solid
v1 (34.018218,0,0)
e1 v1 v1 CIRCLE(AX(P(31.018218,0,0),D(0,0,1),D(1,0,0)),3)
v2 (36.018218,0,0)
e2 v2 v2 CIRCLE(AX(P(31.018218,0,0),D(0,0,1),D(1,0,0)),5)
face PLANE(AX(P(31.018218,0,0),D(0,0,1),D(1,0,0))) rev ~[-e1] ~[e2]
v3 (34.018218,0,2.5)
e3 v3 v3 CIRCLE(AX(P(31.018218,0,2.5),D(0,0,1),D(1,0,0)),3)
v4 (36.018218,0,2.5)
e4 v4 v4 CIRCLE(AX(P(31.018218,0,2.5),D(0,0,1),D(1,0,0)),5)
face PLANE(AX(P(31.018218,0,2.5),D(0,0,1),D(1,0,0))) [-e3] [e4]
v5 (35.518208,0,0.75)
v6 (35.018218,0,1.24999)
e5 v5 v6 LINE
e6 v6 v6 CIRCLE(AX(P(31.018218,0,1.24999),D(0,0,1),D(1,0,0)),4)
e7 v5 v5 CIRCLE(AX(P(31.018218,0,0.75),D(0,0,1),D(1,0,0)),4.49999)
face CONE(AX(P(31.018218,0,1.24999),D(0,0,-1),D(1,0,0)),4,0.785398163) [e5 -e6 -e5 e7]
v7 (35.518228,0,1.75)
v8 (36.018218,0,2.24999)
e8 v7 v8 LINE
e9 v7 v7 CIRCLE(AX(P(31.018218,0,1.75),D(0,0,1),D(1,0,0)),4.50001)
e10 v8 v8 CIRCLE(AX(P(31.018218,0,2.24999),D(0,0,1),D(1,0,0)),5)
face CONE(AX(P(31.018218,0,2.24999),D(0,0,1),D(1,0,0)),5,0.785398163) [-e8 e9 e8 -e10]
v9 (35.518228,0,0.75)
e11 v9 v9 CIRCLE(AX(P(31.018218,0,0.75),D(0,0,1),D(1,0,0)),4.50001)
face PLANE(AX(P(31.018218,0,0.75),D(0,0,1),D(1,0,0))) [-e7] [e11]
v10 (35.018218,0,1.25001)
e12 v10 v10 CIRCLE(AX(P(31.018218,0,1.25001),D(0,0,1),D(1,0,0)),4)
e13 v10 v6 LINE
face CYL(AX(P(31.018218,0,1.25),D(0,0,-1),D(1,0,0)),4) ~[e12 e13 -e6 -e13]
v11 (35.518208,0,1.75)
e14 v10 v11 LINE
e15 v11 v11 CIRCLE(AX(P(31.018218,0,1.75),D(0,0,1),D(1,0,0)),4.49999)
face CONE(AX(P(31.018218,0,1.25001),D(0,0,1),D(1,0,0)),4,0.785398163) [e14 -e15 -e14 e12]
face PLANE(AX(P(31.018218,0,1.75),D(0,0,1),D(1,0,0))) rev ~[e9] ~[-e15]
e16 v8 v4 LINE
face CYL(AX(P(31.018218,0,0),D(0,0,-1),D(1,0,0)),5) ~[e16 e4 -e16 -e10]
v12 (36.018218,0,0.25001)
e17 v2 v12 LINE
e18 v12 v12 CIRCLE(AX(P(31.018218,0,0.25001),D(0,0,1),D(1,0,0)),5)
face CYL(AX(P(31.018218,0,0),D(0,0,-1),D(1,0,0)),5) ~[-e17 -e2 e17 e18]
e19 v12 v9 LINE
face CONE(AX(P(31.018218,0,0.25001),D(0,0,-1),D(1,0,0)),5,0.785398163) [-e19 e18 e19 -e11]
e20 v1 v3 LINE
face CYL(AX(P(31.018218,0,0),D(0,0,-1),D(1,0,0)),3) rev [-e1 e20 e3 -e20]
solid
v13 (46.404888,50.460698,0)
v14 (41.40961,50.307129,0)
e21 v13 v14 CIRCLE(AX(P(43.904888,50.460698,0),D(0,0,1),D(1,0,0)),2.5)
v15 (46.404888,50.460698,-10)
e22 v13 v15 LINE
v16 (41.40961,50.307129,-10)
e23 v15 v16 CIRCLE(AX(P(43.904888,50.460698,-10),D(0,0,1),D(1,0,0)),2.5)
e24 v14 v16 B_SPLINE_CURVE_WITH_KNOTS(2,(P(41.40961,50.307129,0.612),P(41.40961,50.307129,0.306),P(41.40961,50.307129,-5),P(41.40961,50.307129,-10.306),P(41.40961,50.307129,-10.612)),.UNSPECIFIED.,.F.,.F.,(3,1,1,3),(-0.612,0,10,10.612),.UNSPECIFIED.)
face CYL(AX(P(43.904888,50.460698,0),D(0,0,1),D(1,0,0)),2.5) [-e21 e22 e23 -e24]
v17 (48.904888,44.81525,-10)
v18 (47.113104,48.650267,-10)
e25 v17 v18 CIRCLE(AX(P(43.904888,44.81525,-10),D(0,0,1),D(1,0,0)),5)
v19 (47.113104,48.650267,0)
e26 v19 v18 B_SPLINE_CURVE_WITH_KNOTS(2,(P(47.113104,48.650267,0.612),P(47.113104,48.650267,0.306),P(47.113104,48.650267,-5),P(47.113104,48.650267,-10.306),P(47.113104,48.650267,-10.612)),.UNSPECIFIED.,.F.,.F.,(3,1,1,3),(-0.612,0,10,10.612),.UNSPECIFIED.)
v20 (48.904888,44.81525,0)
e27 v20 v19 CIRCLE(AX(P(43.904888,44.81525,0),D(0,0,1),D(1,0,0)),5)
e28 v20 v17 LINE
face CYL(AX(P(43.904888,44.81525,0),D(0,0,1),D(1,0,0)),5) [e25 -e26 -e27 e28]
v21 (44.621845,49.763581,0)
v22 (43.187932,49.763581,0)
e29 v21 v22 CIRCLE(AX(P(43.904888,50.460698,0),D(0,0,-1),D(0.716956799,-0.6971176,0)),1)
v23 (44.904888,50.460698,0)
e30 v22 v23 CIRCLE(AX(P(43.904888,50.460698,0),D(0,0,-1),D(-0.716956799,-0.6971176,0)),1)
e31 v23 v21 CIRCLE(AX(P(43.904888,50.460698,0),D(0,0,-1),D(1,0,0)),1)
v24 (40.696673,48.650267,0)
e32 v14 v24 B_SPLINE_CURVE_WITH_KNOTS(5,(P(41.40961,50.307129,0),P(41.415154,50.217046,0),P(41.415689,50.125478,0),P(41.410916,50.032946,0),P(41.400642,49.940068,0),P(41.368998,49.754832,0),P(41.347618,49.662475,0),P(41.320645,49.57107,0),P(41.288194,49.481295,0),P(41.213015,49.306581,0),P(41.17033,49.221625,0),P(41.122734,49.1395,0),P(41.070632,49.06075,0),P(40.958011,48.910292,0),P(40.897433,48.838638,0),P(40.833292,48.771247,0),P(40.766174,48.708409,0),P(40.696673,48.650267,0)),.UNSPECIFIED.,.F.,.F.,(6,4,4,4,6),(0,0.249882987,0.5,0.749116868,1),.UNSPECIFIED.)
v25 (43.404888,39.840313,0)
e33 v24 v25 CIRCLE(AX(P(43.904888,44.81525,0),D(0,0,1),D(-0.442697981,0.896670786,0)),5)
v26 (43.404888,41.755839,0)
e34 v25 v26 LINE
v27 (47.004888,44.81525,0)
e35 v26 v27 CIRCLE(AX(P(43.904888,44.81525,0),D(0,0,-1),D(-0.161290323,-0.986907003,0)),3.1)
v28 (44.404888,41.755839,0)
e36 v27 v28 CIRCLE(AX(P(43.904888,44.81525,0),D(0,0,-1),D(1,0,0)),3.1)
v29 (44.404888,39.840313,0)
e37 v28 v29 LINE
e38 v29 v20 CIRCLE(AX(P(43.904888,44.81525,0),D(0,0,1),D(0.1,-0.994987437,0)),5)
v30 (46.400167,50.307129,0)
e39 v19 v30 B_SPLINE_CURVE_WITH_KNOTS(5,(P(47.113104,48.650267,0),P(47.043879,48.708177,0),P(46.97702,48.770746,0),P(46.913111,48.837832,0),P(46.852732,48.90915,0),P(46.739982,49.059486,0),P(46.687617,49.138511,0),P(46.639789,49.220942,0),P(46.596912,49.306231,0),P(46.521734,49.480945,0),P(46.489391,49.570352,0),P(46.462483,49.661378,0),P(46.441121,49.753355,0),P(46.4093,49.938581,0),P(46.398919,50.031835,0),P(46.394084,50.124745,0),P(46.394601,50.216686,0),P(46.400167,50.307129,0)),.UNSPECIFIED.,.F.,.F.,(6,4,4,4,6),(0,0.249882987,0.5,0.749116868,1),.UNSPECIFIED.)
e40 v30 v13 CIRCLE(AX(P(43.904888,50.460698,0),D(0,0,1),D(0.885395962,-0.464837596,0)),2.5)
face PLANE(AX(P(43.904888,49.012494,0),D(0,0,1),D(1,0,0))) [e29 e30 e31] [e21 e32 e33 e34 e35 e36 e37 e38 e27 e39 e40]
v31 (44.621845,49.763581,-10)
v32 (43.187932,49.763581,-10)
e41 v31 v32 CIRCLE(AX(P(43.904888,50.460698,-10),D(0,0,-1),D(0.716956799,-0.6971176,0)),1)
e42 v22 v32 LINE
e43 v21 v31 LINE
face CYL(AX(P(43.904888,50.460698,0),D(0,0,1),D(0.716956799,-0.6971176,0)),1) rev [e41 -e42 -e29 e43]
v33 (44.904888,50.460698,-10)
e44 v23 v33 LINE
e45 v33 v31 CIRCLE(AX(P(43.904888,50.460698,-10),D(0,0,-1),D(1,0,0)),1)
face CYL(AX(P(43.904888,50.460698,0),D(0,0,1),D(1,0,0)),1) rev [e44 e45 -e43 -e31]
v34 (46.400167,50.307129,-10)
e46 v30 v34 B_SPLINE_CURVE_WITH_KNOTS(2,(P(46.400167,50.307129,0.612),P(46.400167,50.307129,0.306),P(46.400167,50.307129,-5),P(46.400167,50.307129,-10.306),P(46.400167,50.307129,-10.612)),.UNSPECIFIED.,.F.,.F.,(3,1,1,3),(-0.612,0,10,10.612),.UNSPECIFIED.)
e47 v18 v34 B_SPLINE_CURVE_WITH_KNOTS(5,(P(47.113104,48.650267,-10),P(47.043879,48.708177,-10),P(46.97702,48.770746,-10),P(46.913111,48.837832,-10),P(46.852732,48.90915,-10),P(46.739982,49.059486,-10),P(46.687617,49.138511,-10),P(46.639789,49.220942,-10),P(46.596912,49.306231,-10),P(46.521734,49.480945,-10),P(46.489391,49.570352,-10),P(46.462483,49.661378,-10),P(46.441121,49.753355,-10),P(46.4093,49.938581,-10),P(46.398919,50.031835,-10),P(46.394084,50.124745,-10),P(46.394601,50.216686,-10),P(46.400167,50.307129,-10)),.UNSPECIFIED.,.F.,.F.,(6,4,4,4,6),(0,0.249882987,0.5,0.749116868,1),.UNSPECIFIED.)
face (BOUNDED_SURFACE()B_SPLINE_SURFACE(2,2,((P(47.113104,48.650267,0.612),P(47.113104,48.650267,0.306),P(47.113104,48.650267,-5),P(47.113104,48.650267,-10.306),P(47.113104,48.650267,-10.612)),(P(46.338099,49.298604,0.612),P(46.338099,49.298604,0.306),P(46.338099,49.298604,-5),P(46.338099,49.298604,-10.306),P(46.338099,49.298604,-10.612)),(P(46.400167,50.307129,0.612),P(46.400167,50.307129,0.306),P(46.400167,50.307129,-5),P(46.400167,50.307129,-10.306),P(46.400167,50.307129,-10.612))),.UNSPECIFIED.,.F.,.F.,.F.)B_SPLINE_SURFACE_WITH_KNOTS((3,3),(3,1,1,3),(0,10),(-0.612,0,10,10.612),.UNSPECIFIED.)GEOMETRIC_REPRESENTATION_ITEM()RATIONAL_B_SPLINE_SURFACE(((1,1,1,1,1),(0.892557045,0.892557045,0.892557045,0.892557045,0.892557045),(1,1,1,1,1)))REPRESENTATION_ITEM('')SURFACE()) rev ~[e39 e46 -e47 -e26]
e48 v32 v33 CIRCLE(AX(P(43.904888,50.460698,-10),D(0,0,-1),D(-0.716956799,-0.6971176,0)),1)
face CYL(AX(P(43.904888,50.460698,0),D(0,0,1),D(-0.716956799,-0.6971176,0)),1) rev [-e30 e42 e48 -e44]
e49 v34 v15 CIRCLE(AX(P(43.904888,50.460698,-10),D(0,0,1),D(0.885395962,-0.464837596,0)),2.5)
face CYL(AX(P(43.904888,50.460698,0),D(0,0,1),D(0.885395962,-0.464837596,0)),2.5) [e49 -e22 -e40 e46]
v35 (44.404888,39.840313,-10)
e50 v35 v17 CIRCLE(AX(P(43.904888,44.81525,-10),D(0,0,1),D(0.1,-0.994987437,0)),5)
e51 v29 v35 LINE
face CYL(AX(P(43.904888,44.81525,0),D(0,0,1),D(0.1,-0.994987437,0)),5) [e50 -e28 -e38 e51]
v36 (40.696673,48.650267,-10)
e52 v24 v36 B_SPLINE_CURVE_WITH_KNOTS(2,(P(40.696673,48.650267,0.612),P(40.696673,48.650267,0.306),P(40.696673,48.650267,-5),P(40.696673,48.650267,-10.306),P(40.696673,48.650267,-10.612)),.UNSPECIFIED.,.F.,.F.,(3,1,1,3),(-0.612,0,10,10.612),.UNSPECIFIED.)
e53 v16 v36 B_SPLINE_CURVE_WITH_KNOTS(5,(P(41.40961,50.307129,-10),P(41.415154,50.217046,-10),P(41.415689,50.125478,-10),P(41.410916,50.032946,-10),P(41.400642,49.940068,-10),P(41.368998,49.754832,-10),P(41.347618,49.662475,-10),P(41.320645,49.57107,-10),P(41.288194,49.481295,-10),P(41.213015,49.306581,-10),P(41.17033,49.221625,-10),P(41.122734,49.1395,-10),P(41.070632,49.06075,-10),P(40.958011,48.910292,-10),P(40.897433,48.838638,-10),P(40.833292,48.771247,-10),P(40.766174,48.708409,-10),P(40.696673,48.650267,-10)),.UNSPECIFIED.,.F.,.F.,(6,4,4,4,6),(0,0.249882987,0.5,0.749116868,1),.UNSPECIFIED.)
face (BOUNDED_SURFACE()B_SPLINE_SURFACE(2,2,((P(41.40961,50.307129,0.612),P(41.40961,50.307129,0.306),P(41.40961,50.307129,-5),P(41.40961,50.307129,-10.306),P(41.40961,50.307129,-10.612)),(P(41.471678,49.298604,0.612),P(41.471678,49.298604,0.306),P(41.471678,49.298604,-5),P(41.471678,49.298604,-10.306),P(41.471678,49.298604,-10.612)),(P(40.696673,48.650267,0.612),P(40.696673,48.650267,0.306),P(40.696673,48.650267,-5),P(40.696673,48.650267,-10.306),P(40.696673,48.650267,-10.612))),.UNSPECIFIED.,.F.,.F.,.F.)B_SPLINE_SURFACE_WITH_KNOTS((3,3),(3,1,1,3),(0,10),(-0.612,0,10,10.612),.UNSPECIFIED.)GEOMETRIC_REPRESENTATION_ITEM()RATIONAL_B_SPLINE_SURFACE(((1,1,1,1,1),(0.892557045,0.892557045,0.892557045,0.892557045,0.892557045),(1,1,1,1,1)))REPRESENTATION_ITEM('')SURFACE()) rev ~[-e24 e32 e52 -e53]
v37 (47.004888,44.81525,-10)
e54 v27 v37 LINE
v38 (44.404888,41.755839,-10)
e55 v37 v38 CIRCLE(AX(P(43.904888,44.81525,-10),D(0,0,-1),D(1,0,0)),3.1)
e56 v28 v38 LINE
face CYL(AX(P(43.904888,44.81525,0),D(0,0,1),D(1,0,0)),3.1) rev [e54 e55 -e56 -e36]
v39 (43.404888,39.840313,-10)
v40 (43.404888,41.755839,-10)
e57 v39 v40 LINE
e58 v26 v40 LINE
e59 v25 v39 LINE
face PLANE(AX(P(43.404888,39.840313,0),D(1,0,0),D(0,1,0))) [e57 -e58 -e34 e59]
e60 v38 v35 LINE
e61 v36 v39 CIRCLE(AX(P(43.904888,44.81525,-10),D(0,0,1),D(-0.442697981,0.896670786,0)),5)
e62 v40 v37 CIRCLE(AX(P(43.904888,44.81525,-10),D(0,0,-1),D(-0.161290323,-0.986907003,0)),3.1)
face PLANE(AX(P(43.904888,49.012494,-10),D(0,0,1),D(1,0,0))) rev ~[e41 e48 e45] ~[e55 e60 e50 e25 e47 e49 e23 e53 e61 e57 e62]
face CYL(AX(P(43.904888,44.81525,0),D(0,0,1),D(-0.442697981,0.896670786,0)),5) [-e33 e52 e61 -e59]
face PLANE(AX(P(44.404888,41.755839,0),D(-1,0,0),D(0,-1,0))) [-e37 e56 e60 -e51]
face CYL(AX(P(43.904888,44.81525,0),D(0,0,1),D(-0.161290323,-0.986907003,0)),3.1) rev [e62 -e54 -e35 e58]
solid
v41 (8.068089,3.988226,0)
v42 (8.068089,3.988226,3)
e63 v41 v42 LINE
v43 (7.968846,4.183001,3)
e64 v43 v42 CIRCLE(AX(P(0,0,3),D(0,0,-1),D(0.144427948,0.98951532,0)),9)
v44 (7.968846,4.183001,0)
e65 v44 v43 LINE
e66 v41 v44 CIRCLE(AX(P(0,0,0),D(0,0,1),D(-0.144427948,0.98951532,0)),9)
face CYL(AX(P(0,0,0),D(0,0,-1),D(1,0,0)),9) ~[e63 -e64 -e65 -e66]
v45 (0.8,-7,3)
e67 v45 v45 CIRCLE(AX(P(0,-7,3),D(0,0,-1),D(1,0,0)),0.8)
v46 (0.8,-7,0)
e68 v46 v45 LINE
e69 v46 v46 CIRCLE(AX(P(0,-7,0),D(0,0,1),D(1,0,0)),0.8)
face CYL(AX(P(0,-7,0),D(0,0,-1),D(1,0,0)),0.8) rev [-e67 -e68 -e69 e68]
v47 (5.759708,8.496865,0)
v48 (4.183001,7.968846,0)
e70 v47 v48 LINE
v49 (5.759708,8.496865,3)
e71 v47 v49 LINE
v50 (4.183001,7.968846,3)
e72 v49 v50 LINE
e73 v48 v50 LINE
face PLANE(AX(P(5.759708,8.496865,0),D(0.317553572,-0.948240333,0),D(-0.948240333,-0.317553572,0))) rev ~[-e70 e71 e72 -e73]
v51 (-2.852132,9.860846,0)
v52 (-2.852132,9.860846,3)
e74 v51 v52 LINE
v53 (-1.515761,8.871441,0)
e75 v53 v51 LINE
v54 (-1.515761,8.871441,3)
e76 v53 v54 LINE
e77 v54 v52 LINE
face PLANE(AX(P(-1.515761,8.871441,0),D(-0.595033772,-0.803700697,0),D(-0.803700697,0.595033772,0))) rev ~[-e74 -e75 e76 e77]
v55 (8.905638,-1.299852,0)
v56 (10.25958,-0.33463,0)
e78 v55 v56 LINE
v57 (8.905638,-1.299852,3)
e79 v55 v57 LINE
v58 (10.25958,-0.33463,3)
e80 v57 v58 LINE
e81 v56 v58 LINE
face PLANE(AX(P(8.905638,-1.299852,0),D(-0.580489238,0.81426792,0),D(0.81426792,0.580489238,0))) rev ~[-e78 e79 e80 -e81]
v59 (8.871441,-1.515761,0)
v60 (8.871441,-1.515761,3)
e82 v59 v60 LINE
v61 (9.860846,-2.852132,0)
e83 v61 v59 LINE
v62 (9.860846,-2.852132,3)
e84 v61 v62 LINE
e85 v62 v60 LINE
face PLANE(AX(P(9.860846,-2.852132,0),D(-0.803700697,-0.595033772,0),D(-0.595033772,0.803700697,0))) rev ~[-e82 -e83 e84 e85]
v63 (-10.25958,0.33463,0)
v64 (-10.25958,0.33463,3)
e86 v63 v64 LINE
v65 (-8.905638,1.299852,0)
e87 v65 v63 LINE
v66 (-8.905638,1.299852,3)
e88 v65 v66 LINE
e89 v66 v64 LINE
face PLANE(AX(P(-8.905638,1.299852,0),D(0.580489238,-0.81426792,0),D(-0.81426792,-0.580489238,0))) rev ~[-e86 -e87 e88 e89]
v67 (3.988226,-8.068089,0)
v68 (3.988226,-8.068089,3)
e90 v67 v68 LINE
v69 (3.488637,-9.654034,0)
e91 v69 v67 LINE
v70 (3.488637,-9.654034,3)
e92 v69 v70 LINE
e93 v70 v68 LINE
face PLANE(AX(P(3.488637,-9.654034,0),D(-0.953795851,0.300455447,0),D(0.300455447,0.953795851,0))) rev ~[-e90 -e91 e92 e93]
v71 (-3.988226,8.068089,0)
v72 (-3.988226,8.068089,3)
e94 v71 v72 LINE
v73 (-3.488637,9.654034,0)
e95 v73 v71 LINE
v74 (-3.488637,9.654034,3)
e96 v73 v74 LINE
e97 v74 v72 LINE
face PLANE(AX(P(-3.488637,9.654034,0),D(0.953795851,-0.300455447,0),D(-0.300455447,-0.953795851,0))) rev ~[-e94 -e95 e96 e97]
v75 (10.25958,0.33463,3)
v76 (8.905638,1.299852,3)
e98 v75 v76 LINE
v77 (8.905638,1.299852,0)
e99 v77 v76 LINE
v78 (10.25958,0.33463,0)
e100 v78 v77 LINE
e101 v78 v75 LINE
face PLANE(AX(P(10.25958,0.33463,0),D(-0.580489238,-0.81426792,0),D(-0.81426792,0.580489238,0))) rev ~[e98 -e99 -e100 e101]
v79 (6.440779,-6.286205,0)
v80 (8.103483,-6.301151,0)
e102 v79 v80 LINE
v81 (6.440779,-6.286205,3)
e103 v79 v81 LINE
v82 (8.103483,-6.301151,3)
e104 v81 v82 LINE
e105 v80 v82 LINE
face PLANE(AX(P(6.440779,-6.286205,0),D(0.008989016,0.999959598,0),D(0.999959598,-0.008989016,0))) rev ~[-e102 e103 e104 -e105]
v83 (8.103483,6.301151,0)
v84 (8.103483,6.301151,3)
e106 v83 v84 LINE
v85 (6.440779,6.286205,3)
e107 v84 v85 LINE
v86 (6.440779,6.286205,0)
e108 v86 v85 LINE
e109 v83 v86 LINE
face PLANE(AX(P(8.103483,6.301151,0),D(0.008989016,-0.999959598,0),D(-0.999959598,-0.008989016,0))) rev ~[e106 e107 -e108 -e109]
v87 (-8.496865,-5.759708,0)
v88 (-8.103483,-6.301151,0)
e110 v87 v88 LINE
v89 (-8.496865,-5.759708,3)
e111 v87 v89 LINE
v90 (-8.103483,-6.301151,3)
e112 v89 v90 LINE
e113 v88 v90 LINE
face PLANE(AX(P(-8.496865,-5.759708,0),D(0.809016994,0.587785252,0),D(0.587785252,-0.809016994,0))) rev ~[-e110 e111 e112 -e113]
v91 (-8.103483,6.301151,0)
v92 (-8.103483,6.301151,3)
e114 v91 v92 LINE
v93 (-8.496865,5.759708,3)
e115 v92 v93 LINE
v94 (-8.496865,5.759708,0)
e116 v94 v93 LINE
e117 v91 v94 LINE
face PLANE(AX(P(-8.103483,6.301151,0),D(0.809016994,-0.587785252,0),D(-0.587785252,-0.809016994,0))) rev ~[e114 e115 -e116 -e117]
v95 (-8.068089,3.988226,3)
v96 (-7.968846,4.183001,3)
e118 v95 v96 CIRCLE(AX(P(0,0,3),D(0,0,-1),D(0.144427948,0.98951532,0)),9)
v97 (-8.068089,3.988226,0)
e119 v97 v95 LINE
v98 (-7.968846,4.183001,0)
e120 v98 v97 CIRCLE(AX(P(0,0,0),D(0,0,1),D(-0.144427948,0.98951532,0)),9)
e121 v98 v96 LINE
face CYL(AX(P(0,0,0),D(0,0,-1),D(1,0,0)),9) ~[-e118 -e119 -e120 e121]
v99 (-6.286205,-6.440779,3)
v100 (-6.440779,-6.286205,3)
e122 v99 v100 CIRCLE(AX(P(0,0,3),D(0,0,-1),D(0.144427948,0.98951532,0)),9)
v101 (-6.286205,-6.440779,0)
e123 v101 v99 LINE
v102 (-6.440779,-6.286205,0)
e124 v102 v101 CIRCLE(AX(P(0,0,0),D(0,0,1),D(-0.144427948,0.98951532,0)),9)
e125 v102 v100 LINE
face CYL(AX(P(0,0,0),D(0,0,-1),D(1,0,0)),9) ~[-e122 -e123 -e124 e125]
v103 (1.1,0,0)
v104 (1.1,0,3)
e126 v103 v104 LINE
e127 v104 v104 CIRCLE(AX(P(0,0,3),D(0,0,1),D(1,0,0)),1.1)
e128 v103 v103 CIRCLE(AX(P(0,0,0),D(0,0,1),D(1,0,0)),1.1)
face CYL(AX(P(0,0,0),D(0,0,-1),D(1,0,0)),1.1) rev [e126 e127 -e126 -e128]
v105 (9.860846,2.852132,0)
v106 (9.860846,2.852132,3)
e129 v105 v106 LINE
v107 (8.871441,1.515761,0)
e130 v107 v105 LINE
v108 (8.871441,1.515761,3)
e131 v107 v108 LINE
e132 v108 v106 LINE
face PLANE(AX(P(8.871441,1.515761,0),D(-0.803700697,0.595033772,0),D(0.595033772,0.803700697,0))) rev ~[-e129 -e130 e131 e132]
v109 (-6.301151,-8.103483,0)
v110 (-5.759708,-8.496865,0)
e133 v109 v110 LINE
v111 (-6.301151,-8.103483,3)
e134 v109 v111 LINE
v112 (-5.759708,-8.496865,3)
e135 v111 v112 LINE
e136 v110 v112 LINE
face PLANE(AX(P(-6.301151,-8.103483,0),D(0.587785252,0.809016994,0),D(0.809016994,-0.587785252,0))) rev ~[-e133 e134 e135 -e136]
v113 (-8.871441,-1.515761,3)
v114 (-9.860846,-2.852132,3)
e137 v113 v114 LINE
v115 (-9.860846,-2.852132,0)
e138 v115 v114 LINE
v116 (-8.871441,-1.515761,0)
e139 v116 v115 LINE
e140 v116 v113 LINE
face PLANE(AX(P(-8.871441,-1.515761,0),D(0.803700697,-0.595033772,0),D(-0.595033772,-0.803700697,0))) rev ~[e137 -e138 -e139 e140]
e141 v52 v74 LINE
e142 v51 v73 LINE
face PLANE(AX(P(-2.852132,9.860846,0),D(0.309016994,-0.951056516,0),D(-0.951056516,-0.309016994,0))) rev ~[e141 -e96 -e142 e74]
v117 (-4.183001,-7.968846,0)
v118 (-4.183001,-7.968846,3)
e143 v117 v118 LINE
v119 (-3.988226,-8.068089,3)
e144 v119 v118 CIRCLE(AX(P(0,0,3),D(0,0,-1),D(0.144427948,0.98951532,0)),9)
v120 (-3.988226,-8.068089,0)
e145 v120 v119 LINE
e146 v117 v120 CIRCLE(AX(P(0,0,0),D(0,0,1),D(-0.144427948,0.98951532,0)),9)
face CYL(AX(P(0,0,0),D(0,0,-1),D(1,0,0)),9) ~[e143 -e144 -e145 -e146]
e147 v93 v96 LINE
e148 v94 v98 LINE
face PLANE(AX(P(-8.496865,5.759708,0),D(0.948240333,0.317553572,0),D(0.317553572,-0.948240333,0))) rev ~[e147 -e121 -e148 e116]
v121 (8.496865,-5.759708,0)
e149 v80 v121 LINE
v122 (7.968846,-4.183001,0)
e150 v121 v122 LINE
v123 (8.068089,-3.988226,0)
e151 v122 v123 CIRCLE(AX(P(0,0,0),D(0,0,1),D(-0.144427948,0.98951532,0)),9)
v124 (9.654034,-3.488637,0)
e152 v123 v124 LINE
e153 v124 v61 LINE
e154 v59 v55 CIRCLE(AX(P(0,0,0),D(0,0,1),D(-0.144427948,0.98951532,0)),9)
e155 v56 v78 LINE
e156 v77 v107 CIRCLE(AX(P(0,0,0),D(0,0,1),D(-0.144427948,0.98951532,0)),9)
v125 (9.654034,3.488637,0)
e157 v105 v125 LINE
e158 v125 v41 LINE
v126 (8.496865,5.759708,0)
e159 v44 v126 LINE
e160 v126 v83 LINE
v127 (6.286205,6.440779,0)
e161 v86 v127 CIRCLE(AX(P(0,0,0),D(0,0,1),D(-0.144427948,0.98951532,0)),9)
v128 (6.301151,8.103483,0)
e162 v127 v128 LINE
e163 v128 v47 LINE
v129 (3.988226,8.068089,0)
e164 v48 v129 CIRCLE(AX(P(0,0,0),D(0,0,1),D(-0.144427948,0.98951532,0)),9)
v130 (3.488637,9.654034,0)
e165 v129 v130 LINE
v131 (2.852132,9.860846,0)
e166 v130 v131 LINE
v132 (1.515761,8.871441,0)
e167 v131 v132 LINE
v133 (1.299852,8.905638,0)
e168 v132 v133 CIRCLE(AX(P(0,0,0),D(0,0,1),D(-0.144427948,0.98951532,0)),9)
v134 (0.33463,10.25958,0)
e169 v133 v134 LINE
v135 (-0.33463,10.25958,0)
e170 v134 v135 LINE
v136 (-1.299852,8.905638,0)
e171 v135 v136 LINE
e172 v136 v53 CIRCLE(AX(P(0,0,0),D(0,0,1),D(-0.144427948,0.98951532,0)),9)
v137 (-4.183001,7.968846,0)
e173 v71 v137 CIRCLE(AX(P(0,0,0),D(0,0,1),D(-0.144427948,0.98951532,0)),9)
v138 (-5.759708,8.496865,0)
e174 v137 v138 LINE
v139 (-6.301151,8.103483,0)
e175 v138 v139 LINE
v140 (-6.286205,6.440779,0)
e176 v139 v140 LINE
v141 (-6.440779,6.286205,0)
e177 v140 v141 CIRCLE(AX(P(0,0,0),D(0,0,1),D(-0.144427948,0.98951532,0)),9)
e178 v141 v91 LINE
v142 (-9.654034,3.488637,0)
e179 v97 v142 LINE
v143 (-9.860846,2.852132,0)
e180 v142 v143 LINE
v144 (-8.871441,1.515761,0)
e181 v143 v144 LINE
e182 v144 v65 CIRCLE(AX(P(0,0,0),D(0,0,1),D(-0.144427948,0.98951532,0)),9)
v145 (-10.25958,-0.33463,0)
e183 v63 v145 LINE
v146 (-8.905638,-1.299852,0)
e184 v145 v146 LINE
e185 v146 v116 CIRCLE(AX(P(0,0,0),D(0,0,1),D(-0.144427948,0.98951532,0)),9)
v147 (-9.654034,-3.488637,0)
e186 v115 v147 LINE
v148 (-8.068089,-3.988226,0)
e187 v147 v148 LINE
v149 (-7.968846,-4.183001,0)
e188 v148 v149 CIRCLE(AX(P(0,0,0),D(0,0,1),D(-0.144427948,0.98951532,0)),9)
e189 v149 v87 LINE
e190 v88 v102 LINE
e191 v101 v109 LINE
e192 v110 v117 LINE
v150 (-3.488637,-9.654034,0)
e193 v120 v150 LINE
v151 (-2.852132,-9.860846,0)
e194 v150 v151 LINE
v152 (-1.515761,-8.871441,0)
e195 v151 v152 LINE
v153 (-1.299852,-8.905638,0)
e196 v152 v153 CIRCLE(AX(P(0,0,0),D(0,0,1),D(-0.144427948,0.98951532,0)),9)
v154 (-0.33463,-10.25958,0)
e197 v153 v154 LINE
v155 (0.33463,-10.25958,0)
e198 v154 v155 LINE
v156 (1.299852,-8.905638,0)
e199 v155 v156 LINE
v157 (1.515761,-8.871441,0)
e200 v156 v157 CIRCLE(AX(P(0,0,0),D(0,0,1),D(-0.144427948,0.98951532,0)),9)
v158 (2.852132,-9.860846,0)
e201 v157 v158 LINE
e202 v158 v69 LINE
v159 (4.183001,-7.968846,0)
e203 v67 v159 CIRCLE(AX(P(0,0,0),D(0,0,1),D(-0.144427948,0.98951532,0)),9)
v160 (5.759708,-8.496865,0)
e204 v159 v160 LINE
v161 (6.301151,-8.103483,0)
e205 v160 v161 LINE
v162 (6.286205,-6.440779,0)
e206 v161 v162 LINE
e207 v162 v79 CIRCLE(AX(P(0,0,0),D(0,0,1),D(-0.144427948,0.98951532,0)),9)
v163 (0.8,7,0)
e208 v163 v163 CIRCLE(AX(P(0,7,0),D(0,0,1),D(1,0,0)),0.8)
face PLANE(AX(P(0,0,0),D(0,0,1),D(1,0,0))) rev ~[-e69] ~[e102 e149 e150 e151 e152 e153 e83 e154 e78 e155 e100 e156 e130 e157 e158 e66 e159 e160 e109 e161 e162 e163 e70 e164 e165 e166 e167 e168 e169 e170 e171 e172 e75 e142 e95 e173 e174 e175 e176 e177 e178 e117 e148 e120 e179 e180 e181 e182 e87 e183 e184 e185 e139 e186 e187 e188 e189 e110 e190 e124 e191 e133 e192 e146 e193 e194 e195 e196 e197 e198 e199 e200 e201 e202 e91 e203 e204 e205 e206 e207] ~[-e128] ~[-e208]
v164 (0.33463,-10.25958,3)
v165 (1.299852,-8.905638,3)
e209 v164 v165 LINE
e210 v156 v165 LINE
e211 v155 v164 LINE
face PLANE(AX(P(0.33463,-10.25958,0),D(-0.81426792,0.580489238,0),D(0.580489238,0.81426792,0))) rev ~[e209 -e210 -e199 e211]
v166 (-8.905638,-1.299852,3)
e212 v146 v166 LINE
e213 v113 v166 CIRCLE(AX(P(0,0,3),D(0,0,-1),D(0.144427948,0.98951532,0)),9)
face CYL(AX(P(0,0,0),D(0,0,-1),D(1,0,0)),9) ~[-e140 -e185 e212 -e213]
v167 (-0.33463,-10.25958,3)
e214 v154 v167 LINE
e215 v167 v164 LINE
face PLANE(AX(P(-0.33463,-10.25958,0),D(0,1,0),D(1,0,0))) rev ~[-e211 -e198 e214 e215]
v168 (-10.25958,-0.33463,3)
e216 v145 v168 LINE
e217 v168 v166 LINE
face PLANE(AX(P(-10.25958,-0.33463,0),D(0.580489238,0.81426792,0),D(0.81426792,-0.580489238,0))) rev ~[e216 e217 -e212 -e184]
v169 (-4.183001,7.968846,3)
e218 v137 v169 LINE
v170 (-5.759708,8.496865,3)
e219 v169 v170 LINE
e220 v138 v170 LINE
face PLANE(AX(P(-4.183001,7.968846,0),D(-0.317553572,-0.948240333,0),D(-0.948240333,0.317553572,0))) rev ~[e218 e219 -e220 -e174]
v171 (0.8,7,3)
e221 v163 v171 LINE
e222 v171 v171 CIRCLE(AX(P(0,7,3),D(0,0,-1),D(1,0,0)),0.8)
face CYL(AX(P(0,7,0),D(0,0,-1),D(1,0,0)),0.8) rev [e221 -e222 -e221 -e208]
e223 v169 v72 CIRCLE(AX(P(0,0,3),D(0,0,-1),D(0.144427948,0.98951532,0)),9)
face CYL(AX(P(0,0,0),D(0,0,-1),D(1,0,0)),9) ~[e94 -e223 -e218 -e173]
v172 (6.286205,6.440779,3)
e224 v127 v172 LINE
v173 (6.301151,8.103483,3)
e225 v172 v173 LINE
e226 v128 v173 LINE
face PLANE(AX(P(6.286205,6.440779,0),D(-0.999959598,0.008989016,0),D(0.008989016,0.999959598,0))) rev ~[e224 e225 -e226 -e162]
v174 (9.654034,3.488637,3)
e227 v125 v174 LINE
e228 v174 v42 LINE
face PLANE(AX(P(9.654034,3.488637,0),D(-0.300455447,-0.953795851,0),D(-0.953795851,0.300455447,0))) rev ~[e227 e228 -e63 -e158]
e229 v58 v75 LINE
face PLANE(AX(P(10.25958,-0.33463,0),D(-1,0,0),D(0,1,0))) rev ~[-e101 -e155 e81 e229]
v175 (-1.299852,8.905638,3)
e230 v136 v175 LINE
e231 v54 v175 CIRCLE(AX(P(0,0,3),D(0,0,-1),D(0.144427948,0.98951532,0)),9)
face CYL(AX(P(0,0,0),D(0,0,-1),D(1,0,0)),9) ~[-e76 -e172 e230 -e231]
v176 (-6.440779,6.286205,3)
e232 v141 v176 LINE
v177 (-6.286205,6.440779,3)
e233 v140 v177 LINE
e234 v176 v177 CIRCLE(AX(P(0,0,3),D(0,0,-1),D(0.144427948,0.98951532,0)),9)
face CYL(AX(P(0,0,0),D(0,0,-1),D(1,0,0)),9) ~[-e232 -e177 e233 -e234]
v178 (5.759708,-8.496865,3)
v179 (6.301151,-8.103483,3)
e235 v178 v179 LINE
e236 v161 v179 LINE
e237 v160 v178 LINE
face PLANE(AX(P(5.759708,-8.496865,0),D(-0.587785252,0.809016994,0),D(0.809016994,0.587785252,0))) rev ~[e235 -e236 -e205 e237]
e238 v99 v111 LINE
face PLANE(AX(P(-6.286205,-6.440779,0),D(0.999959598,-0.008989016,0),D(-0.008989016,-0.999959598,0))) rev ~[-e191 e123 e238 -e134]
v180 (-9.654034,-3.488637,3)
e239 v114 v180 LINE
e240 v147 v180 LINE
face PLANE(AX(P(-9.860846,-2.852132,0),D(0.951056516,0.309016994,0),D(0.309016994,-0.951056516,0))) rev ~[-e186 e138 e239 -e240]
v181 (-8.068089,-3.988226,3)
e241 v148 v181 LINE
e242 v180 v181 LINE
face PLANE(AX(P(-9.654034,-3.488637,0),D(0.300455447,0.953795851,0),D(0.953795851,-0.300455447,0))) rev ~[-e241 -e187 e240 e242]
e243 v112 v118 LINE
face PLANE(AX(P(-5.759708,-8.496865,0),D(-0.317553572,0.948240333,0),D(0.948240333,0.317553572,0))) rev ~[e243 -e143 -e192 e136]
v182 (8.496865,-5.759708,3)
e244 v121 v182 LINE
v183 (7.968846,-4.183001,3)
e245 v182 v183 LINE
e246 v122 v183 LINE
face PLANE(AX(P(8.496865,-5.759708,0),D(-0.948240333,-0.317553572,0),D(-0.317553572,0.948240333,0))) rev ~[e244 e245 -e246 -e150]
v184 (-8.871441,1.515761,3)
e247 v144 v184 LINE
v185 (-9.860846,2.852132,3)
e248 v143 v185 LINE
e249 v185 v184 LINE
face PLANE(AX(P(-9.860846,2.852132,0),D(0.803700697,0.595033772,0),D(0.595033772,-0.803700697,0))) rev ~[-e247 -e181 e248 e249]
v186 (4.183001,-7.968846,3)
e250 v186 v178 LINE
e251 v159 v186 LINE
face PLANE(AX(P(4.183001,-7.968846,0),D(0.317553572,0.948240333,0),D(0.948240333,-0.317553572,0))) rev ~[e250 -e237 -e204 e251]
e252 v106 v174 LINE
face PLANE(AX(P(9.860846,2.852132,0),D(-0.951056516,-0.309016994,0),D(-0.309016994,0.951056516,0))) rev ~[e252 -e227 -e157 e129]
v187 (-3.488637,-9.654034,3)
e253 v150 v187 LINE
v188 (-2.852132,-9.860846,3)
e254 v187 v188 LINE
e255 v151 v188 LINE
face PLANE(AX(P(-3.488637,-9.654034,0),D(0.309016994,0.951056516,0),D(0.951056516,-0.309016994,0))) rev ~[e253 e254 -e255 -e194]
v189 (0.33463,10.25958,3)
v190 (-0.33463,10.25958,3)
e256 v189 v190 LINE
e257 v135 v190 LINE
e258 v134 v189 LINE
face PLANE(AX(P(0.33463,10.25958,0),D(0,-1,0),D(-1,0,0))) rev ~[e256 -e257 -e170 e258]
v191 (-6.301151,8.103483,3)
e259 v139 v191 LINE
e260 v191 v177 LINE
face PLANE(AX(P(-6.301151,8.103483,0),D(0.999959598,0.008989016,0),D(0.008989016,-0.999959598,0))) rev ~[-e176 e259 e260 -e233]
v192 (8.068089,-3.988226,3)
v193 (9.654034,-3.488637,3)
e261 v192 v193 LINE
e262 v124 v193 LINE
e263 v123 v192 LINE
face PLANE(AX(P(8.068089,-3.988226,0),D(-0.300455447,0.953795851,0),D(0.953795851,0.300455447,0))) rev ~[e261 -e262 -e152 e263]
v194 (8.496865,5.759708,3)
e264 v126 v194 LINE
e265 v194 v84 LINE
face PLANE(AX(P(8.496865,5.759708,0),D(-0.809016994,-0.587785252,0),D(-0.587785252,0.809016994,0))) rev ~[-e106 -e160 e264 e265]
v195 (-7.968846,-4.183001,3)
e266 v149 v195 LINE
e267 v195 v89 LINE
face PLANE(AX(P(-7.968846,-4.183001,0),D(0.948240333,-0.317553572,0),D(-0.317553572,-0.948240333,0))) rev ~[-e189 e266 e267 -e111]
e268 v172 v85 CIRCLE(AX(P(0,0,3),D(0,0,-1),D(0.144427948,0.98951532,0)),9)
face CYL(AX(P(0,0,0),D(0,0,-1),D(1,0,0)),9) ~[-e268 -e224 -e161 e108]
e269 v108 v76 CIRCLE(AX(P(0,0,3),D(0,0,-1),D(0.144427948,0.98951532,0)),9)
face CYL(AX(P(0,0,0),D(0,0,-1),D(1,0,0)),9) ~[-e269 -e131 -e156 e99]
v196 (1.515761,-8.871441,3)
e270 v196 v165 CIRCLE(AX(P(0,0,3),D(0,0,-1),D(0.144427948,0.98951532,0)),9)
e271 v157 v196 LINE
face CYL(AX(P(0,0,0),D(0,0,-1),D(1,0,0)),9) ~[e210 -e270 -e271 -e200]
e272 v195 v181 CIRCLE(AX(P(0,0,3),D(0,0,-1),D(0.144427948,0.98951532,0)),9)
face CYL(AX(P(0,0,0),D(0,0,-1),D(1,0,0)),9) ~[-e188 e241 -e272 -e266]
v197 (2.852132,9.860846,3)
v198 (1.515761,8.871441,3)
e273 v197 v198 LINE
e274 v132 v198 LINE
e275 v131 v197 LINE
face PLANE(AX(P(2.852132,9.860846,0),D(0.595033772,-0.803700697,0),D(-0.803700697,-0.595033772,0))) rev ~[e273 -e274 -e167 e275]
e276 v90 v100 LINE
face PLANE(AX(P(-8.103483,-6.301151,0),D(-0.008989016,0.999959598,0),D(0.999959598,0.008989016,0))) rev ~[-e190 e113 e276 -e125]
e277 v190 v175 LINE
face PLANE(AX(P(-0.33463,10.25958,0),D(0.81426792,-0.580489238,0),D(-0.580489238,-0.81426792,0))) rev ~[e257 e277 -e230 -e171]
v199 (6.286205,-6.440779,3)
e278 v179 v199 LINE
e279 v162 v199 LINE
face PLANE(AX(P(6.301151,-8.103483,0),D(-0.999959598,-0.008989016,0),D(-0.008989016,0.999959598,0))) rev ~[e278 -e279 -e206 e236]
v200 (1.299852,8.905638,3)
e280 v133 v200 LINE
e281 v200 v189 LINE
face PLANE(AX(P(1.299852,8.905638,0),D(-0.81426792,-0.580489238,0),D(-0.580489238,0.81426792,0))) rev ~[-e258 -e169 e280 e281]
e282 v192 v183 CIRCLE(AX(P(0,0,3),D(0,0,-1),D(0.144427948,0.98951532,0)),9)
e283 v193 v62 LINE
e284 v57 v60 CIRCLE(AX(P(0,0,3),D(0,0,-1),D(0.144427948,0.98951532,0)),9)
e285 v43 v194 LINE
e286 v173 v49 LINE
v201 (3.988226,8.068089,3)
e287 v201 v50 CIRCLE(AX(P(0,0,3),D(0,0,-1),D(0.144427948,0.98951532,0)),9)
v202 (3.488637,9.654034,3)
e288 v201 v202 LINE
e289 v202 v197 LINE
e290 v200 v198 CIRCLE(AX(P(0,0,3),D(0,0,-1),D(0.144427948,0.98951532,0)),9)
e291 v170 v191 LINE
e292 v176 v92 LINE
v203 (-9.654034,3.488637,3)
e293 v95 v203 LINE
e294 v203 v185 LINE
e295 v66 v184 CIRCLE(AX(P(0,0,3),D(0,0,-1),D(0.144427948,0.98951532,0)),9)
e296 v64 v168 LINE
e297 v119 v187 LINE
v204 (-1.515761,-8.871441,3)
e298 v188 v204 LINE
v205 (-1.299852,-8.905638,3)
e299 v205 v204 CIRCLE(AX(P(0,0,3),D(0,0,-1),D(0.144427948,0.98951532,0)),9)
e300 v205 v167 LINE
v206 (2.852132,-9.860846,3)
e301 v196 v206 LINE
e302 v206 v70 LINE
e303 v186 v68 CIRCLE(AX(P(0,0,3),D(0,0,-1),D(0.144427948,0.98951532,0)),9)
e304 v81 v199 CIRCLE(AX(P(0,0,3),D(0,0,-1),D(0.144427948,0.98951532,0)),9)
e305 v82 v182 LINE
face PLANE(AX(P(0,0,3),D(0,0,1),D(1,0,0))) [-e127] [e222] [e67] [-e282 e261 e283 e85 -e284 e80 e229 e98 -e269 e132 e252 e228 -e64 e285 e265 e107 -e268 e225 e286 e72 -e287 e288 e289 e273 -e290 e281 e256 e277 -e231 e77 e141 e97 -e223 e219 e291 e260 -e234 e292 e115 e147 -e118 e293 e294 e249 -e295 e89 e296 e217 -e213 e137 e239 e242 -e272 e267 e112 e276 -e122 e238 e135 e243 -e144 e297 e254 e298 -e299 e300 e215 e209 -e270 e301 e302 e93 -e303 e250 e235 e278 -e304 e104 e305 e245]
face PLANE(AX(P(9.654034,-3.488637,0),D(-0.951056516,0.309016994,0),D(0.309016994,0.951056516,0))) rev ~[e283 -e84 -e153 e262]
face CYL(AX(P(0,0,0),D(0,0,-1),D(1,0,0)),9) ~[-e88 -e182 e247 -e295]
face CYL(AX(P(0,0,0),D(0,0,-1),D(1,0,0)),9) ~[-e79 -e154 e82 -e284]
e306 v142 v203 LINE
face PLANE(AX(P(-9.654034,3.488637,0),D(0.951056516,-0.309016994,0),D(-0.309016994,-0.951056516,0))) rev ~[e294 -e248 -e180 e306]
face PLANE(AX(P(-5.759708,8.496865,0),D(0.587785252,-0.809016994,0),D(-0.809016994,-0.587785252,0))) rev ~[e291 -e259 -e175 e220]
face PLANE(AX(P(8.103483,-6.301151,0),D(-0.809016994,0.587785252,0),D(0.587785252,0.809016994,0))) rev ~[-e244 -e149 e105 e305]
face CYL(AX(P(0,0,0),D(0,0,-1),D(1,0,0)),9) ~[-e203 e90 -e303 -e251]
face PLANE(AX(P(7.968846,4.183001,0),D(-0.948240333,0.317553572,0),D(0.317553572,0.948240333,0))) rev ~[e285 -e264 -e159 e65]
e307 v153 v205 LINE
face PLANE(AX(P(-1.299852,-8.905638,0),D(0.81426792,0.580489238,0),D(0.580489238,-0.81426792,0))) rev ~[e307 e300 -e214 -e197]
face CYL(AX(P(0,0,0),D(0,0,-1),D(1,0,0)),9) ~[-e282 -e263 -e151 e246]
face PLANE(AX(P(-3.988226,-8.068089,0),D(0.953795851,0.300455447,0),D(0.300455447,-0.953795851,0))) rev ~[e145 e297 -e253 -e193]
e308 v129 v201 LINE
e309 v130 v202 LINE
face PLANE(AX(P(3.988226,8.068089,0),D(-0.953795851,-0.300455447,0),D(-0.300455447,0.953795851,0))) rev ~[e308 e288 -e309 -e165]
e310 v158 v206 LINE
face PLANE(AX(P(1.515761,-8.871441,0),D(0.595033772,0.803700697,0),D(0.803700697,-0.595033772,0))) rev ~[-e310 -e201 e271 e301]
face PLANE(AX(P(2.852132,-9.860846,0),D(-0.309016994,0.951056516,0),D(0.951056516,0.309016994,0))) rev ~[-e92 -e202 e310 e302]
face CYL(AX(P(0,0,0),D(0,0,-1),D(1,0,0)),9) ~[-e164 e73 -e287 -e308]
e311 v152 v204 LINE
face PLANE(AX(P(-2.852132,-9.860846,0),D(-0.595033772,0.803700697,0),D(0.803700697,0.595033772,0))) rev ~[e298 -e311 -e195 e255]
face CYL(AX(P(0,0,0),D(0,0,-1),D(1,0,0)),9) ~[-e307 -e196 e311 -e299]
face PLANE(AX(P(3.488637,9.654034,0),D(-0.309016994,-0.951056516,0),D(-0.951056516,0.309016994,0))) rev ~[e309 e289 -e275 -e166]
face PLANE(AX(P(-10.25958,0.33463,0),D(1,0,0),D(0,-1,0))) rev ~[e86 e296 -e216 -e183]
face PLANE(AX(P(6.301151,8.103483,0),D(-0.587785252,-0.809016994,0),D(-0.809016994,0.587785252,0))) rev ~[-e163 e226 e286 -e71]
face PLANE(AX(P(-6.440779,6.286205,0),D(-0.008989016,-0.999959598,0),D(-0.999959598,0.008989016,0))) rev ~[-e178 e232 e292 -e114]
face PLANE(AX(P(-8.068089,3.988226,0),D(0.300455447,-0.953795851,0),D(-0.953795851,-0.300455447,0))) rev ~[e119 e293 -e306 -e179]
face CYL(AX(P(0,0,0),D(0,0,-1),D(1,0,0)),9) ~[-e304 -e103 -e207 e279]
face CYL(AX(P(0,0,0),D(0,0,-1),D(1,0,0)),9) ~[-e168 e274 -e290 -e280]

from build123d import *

# Parameters (mm, degrees)
F0_R            = 9
F0_R_2          = 1.1
F1_DEPTH        = 3
F2_R            = 5
F2_R_2          = 3
F3_DEPTH        = 2.5
F5_DEPTH        = 3
F5_COPIES_COUNT = 20
F6_R            = 0.8
F7_DEPTH        = 25
F9_R            = 5
F9_R_2          = 4
F10_DEPTH       = 0.5
F11_SIZE        = 0.49999
F13_DEPTH       = 10
F14_R           = 2


# Not quite as in the source:
# - a fillet or chamfer is up to 0.001 mm smaller than in the source, because OpenCascade refuses the exact size
# - a pattern or mirror of a feature is missing from the dataset's text; its kind, count and spacing are read off the source's solid
# - a feature names something its author has since deleted; it is built from what else it names


with BuildPart() as f1:
    # F0 (on Top) → F1 (new body)
    with BuildSketch(Plane.XY):
        Circle(F0_R)
        Circle(F0_R_2, mode=Mode.SUBTRACT)
    extrude(amount=F1_DEPTH)

    # F4 (on Top) → F5 (join, through all)
    with BuildSketch(Plane.XY):
        with BuildLine():
            Line((1.2998515312, 8.905637877), (0.334630427, 10.2595795691))
            Line((0.334630427, 10.2595795691), (-0.334630427, 10.2595795691))
            Line((-0.334630427, 10.2595795691), (-1.2998515312, 8.905637877))
            ThreePointArc((-1.2998515312, 8.905637877), (0, 9), (1.2998515312, 8.905637877))
        make_face()
    f5 = extrude(amount=F5_DEPTH)

    # F5_copies: F5 ×20 about axis
    f5_copies_axis = Axis((0, 0, 0), (0, 0, 1))
    for i in range(1, F5_COPIES_COUNT):
        add(f5.rotate(f5_copies_axis, i * 360 / F5_COPIES_COUNT))

    # F6 (on Top) → F7 (cut)
    with BuildSketch(Plane.XY):
        with Locations((0, 7)):
            Circle(F6_R)
        with Locations((0, -7)):
            Circle(F6_R)
    extrude(amount=F7_DEPTH, mode=Mode.SUBTRACT)


with BuildPart() as f3:
    # F2 (on Top) → F3 (new body)
    with BuildSketch(Plane.XY):
        with Locations((31.0182180256, 0)):
            Circle(F2_R)
        with Locations((31.0182180256, 0)):
            Circle(F2_R_2, mode=Mode.SUBTRACT)
    extrude(amount=F3_DEPTH)

    # F9 (on mid) → F10 (cut, symmetric)
    with BuildSketch(Plane.XY.offset(1.25)):
        with Locations((31.0182180256, 0)):
            Circle(F9_R)
        with Locations((31.0182180256, 0)):
            Circle(F9_R_2, mode=Mode.SUBTRACT)
    extrude(amount=F10_DEPTH, both=True, mode=Mode.SUBTRACT)

    # F11 (size 0.5 in the source; OpenCascade refuses exactly that, so slightly less here)
    f11_edges = [f3.edges().sort_by_distance(p)[0] for p in [
        (26.018218, 0, 1.75),
        (27.018218, 0, 1.75),
        (26.018218, 0, 0.75),
        (27.018218, 0, 0.75),
    ]]
    chamfer(f11_edges, length=F11_SIZE)


with BuildPart() as f13:
    # F12 (on Top) → F13 (new body)
    with BuildSketch(Plane.XY):
        with BuildLine():
            ThreePointArc((44.6218451609, 49.7635806519), (43.9048883617, 49.4606982518), (43.1879315625, 49.7635806519))
            ThreePointArc((43.1879315625, 49.7635806519), (42.4213351165, 49.5900874785), (41.6913984575, 49.2986042608))
            ThreePointArc((41.6913984575, 49.2986042608), (43.9048883617, 47.9606982518), (46.1183782659, 49.2986042608))
            ThreePointArc((46.1183782659, 49.2986042608), (45.3884416069, 49.5900874785), (44.6218451609, 49.7635806519))
        make_face()
        with BuildLine():
            ThreePointArc((43.1879315625, 49.7635806519), (43.528694794, 51.3872393462), (44.9048883617, 50.4606982518))
            ThreePointArc((44.9048883617, 50.4606982518), (44.8314294561, 50.0845046841), (44.6218451609, 49.7635806519))
            ThreePointArc((44.6218451609, 49.7635806519), (45.3884416069, 49.5900874785), (46.1183782659, 49.2986042608))
            ThreePointArc((46.1183782659, 49.2986042608), (46.3322042415, 49.8622522478), (46.4048883617, 50.4606982518))
            ThreePointArc((46.4048883617, 50.4606982518), (43.3064423576, 52.8880141316), (41.6913984575, 49.2986042608))
            ThreePointArc((41.6913984575, 49.2986042608), (42.4213351165, 49.5900874785), (43.1879315625, 49.7635806519))
        make_face()
        with BuildLine():
            ThreePointArc((46.1183782659, 49.2986042608), (43.9048883617, 47.9606982518), (41.6913984575, 49.2986042608))
            ThreePointArc((41.6913984575, 49.2986042608), (38.9849722484, 43.9239448645), (43.4048883617, 39.8403131472))
            Line((43.4048883617, 39.8403131472), (43.4048883617, 41.7558386246))
            ThreePointArc((43.4048883617, 41.7558386246), (41.8974023717, 47.1774526949), (47.0048883617, 44.8152503327))
            ThreePointArc((47.0048883617, 44.8152503327), (46.2670907239, 42.8077643427), (44.4048883617, 41.7558386246))
            Line((44.4048883617, 41.7558386246), (44.4048883617, 39.8403131472))
            ThreePointArc((44.4048883617, 39.8403131472), (47.6129876052, 41.4611483665), (48.9048883617, 44.8152503327))
            ThreePointArc((48.9048883617, 44.8152503327), (48.15150169, 47.4546205681), (46.1183782659, 49.2986042608))
        make_face()
    extrude(amount=-F13_DEPTH)

    # F14
    f14_edges = [f13.edges().sort_by_distance(p)[0] for p in [
        (46.118378, 49.298604, -5),
        (41.691398, 49.298604, -5),
    ]]
    fillet(f14_edges, radius=F14_R)


solid = Compound([f1.part, f3.part, f13.part])
